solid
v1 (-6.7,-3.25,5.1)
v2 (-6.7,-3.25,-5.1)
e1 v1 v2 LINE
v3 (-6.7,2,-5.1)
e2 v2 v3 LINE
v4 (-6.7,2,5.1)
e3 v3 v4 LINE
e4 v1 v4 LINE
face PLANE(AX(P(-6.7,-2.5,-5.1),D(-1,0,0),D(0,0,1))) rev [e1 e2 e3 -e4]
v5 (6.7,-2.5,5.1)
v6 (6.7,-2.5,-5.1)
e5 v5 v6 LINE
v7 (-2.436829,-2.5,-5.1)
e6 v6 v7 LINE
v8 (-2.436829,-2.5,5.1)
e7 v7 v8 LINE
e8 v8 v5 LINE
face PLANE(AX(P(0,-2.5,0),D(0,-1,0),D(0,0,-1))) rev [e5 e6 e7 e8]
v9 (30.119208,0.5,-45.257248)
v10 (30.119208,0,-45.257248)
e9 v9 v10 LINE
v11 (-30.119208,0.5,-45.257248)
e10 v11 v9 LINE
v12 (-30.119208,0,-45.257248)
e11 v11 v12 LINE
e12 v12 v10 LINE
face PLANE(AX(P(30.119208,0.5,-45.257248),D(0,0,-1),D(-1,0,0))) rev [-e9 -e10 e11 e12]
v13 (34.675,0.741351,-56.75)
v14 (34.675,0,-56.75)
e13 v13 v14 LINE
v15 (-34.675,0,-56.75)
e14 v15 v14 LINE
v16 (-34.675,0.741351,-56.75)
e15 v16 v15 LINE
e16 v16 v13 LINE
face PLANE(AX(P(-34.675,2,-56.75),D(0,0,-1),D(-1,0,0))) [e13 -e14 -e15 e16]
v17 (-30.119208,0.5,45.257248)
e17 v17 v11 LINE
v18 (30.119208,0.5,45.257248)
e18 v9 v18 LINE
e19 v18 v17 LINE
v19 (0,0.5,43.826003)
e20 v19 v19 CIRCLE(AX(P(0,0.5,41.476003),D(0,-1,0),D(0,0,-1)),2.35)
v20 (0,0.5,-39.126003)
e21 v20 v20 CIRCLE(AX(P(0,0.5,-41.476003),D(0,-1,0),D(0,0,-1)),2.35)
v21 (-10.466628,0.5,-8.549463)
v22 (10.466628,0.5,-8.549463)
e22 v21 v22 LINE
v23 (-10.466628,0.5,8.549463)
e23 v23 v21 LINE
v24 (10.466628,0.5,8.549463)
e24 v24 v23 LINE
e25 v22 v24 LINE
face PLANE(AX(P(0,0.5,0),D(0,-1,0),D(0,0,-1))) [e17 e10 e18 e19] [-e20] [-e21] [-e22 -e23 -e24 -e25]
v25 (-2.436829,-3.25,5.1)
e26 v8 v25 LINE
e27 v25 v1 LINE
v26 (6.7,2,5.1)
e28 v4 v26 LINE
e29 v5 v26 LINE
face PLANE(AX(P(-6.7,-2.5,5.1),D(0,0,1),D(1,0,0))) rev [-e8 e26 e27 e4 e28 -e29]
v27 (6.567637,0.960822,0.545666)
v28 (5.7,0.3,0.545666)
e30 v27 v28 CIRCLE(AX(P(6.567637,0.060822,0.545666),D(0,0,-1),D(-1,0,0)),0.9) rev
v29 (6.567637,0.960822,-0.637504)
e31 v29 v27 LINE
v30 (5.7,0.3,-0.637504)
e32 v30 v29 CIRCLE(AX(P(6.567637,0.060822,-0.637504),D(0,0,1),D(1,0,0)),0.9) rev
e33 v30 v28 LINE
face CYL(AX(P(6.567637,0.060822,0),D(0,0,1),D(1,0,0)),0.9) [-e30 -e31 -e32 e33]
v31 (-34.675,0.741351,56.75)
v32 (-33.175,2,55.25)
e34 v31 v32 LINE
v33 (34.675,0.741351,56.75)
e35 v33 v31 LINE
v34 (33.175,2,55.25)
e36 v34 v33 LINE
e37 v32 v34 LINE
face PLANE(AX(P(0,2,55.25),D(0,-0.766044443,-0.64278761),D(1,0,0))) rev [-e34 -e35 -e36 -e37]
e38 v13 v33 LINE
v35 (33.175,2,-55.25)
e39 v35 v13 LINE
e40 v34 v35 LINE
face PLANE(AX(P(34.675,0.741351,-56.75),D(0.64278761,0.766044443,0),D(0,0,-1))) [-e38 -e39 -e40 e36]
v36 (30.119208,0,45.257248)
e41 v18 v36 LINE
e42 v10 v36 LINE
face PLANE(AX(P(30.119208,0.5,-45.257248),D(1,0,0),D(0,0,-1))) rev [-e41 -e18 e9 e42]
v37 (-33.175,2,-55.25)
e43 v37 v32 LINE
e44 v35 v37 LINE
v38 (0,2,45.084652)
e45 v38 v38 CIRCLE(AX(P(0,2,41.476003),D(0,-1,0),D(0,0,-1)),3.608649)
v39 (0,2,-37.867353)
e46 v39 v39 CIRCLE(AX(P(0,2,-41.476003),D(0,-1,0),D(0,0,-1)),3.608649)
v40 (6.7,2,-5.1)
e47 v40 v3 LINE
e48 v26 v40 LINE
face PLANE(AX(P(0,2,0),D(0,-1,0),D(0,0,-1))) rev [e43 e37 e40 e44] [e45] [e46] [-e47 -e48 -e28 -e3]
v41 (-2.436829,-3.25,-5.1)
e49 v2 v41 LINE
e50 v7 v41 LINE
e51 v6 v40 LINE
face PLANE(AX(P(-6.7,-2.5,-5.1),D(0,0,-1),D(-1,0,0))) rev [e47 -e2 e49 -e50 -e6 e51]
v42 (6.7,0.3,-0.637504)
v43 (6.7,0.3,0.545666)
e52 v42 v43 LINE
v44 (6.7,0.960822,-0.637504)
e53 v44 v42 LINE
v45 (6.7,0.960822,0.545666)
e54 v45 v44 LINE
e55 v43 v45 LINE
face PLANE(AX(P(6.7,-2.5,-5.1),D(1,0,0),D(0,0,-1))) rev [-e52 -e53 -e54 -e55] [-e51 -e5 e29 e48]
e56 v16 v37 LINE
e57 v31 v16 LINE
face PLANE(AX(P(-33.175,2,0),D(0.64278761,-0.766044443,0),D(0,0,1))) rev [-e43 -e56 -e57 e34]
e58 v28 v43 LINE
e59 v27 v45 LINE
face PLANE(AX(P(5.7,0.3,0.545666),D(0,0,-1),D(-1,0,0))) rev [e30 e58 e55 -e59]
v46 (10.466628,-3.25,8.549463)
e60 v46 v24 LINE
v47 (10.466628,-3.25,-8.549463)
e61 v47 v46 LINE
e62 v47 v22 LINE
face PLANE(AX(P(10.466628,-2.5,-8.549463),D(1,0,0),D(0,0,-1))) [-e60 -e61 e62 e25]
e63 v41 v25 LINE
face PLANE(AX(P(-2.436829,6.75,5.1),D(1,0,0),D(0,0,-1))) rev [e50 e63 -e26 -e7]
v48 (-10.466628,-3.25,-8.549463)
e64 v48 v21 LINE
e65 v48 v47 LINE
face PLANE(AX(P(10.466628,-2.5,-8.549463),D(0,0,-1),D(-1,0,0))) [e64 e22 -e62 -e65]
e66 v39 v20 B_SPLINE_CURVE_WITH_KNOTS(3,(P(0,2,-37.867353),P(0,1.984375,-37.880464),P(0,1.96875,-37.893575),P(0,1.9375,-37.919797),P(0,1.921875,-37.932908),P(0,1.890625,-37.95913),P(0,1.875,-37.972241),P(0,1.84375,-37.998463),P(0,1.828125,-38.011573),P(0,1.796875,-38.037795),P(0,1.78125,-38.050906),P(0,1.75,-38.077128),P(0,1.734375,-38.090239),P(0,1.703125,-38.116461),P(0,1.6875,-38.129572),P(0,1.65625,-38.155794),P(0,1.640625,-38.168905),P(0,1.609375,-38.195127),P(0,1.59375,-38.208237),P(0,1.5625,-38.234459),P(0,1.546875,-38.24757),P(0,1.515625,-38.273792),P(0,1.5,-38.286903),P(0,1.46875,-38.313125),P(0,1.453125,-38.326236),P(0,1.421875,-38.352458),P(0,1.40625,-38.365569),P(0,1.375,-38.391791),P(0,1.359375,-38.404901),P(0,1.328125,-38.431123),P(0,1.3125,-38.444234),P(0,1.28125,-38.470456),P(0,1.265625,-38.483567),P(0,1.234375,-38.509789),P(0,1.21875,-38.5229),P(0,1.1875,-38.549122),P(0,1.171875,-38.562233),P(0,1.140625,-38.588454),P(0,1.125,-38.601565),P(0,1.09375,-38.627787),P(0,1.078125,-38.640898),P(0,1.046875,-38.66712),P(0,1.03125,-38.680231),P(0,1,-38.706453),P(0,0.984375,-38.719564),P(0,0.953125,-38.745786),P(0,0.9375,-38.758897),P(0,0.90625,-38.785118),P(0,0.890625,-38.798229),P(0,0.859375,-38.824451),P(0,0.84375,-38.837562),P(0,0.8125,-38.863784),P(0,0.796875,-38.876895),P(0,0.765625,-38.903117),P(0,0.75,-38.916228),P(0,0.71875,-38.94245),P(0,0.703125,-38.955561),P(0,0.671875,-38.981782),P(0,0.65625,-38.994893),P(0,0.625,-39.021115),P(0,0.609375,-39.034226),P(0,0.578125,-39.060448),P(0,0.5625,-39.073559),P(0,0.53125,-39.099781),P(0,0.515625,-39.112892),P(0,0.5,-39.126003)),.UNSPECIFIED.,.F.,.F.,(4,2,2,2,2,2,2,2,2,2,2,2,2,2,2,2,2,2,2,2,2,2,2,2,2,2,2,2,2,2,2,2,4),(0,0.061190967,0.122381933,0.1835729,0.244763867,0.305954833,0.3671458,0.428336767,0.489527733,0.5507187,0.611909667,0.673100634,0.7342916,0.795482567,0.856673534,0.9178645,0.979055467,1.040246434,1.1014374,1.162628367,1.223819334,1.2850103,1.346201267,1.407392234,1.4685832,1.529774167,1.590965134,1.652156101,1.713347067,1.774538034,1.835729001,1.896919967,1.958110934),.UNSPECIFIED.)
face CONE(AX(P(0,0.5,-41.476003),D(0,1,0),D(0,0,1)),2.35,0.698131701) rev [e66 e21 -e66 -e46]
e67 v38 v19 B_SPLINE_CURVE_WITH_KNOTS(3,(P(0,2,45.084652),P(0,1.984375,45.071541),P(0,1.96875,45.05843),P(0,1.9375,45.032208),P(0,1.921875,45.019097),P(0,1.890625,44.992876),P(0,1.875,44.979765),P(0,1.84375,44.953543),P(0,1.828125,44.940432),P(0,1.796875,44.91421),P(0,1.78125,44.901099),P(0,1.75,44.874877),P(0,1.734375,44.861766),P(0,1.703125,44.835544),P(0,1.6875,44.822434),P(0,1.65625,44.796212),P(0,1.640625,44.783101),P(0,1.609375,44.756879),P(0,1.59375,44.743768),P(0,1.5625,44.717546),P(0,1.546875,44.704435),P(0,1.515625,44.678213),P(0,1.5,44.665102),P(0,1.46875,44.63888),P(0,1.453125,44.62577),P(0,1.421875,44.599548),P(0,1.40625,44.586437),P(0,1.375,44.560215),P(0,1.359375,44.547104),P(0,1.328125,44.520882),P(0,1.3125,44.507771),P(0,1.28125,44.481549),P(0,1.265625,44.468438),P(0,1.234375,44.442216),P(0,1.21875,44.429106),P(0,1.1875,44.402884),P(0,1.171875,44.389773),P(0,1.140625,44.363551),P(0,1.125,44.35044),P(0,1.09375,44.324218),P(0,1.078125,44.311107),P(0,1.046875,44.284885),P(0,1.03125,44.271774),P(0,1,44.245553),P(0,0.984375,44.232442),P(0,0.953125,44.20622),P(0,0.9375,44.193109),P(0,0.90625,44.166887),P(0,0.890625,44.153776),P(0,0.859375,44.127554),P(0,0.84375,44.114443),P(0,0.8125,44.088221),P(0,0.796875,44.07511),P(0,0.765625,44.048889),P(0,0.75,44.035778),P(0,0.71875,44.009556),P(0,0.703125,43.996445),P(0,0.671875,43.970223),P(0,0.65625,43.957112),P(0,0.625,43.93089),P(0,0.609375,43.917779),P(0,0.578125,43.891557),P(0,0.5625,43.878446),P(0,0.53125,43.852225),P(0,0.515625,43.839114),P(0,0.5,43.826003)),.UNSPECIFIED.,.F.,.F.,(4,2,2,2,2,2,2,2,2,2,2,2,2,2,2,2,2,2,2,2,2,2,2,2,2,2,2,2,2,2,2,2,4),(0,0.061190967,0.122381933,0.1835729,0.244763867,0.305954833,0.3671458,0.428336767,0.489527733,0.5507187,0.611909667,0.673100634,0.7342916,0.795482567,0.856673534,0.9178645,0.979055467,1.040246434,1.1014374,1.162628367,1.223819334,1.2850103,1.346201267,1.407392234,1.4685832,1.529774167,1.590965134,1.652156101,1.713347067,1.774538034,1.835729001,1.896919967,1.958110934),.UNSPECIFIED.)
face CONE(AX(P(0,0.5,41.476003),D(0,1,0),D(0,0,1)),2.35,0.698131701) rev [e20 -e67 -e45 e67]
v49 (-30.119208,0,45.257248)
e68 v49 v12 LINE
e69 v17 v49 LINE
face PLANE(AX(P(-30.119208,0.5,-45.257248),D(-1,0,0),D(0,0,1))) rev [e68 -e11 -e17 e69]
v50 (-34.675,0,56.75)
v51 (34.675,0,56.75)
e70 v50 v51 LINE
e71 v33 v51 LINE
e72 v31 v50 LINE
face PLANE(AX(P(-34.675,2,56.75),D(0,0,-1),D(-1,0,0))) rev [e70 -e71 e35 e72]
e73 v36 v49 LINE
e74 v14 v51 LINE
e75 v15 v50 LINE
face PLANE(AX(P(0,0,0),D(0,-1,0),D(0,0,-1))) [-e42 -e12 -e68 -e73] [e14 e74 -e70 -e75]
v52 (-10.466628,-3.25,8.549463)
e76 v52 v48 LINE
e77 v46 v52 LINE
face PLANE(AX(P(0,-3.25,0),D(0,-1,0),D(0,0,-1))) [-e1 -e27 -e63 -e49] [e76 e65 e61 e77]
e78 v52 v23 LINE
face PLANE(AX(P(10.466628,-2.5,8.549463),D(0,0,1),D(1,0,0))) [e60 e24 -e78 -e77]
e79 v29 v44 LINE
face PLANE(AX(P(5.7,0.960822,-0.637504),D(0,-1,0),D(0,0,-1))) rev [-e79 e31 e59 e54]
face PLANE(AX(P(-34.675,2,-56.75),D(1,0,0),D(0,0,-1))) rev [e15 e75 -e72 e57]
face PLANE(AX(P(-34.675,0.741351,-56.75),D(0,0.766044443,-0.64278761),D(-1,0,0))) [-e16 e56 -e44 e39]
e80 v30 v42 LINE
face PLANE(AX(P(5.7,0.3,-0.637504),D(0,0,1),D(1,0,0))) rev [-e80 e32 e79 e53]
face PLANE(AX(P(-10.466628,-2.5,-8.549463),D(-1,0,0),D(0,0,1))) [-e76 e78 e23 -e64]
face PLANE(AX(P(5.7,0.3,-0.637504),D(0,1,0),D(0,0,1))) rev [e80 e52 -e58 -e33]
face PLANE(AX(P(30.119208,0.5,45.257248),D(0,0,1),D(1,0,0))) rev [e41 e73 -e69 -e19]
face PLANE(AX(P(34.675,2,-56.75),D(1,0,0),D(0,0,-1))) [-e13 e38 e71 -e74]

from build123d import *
from OCP.BRepFilletAPI import BRepFilletAPI_MakeChamfer

# Parameters (mm, degrees)
SKETCH1_W            = 69.35
SKETCH1_H            = 113.5
BOSS_EXTRUDE5_DEPTH  = 2
SKETCH2_R            = 2.35
CUT_EXTRUDE3_DEPTH   = 2.5
FACE_CHAMFER_SIZE    = 1.5
FACE_CHAMFER_SIZE2   = 1.258649447
SKETCH4_W            = 60.238416088
SKETCH4_H            = 90.514495008
CUT_EXTRUDE6_DEPTH   = 0.5
SKETCH5_W            = 20.93325514
SKETCH5_H            = 17.0989254
SKETCH5_W_2          = 13.4
SKETCH5_H_2          = 10.2
BOSS_EXTRUDE7_DEPTH  = 4.5
SKETCH6_W            = 13.4
SKETCH6_H            = 10.2
CUT_EXTRUDE7_DEPTH   = 4.1
SKETCH7_W            = 20.93325514
SKETCH7_H            = 17.0989254
BOSS_EXTRUDE8_DEPTH  = 0.75
SKETCH8_W            = 2.621357244
SKETCH8_H            = 10.2
CUT_EXTRUDE8_DEPTH   = 0.5
SKETCH10_W           = 1.18316995
SKETCH10_H           = 0.660821766
BOSS_EXTRUDE11_DEPTH = 1
FILLET1_R            = 0.9
SKETCH11_W           = 4.263170706
SKETCH11_H           = 10.2
CUT_EXTRUDE9_DEPTH   = 10


with BuildPart() as part:
    # Sketch1 → Boss-Extrude5 (new body)
    with BuildSketch(Plane(origin=(0, 0, 0), x_dir=(1, 0, 0), z_dir=(0, 1, 0))):
        Rectangle(SKETCH1_W, SKETCH1_H)
    extrude(amount=BOSS_EXTRUDE5_DEPTH)

    # Sketch2 → Cut-Extrude3 (cut)
    with BuildSketch(Plane(origin=(0, 2, 0), x_dir=(1, 0, 0), z_dir=(0, 1, 0))):
        with Locations(Location((0, 41.476002696, 0), (0, 0, 270))):
            Circle(SKETCH2_R)
        with Locations(Location((0, -41.476002696, 0), (0, 0, 90))):
            Circle(SKETCH2_R)
    extrude(amount=-CUT_EXTRUDE3_DEPTH, mode=Mode.SUBTRACT)

    # face chamfer: one chamfer whose edges measure the first distance from different faces: ONE call of the kernel's chamfer builder (chamfer() names one face for all edges)
    face_chamfer_edges_1 = [part.edges().sort_by_distance(p)[0] for p in [
        (0, 2, -56.75),
        (-34.675, 2, 0),
        (0, 2, 56.75),
        (34.675, 2, 0),
    ]]
    face_chamfer_side_1 = [part.faces().sort_by_distance(p)[0] for p in [
        (0, 2, 0),
    ]]
    face_chamfer_edges_2 = [part.edges().sort_by_distance(p)[0] for p in [
        (0, 2, -43.826002696),
    ]]
    face_chamfer_side_2 = [part.faces().sort_by_distance(p)[0] for p in [
        (0, 1, -43.826002696),
    ]]
    face_chamfer_edges_3 = [part.edges().sort_by_distance(p)[0] for p in [
        (0, 2, 43.826002696),
    ]]
    face_chamfer_side_3 = [part.faces().sort_by_distance(p)[0] for p in [
        (0, 1, 43.826002696),
    ]]
    face_chamfer = BRepFilletAPI_MakeChamfer(part.part.solid().wrapped)
    for e in face_chamfer_edges_1:
        face_chamfer.Add(FACE_CHAMFER_SIZE, FACE_CHAMFER_SIZE2, e.wrapped, face_chamfer_side_1[0].wrapped)  # the first distance lies on this face
    for e in face_chamfer_edges_2:
        face_chamfer.Add(FACE_CHAMFER_SIZE, FACE_CHAMFER_SIZE2, e.wrapped, face_chamfer_side_2[0].wrapped)  # the first distance lies on this face
    for e in face_chamfer_edges_3:
        face_chamfer.Add(FACE_CHAMFER_SIZE, FACE_CHAMFER_SIZE2, e.wrapped, face_chamfer_side_3[0].wrapped)  # the first distance lies on this face
    add(Compound.cast(face_chamfer.Shape()), mode=Mode.REPLACE)

    # Sketch4 → Cut-Extrude6 (cut)
    with BuildSketch(Plane(origin=(0, 0, 0), x_dir=(-1, 0, 0), z_dir=(0, -1, 0))):
        Rectangle(SKETCH4_W, SKETCH4_H)
    extrude(amount=-CUT_EXTRUDE6_DEPTH, mode=Mode.SUBTRACT)

    # Sketch5 → Boss-Extrude7 (add)
    with BuildSketch(Plane(origin=(0, 2, 0), x_dir=(1, 0, 0), z_dir=(0, 1, 0))):
        Rectangle(SKETCH5_W, SKETCH5_H)
        Rectangle(SKETCH5_W_2, SKETCH5_H_2, mode=Mode.SUBTRACT)
    extrude(amount=-BOSS_EXTRUDE7_DEPTH)

    # Sketch6 → Cut-Extrude7 (cut)
    with BuildSketch(Plane(origin=(0, 2, 0), x_dir=(1, 0, 0), z_dir=(0, 1, 0))):
        Rectangle(SKETCH6_W, SKETCH6_H)
    extrude(amount=-CUT_EXTRUDE7_DEPTH, mode=Mode.SUBTRACT)

    # Sketch7 → Boss-Extrude8 (add)
    with BuildSketch(Plane.XZ.offset(2.5)):
        Rectangle(SKETCH7_W, SKETCH7_H)
    extrude(amount=BOSS_EXTRUDE8_DEPTH)

    # Sketch8 → Cut-Extrude8 (cut)
    with BuildSketch(Plane(origin=(0, -2.5, 0), x_dir=(1, 0, 0), z_dir=(0, 1, 0))):
        with Locations((-5.389321378, 0)):
            Rectangle(SKETCH8_W, SKETCH8_H)
    extrude(amount=-CUT_EXTRUDE8_DEPTH, mode=Mode.SUBTRACT)

    # Sketch10 → Boss-Extrude11 (add)
    with BuildSketch(Plane.ZY.offset(-6.7)):
        with Locations((-0.045919003, 0.630410883)):
            Rectangle(SKETCH10_W, SKETCH10_H)
    extrude(amount=BOSS_EXTRUDE11_DEPTH)

    # Fillet1
    # the kernel refuses this fillet: 0.9 mm, written as the material it takes off along each edge
    with BuildSketch(Plane(origin=(5.7, 0.960821766, 2.714758197), x_dir=(1, 0, 0), z_dir=(0, 0, -1))) as fillet1_piece_1:
        with BuildLine():
            CenterArc((0.86763689, 0.9), FILLET1_R, 195.411736224, 74.588263776)
            Line((0, 0.660821766), (-0.017352738, 0.656038202))
            ThreePointArc((-0.017352738, 0.656038202), (-0.018, 0.330410883), (-0.018, 0))
            Line((-0.018, 0), (0, -0.018))
            Line((0, -0.018), (0.86763689, -0.018))
            Line((0.86763689, -0.018), (0.86763689, 0))
        make_face()
    extrude(amount=5.521354399, mode=Mode.SUBTRACT)

    # Sketch11 → Cut-Extrude9 (cut)
    with BuildSketch(Plane(origin=(0, -3.25, 0), x_dir=(-1, 0, 0), z_dir=(0, -1, 0))):
        with Locations((4.568414647, 0)):
            Rectangle(SKETCH11_W, SKETCH11_H)
    extrude(amount=-CUT_EXTRUDE9_DEPTH, mode=Mode.SUBTRACT)


solid = part.part
